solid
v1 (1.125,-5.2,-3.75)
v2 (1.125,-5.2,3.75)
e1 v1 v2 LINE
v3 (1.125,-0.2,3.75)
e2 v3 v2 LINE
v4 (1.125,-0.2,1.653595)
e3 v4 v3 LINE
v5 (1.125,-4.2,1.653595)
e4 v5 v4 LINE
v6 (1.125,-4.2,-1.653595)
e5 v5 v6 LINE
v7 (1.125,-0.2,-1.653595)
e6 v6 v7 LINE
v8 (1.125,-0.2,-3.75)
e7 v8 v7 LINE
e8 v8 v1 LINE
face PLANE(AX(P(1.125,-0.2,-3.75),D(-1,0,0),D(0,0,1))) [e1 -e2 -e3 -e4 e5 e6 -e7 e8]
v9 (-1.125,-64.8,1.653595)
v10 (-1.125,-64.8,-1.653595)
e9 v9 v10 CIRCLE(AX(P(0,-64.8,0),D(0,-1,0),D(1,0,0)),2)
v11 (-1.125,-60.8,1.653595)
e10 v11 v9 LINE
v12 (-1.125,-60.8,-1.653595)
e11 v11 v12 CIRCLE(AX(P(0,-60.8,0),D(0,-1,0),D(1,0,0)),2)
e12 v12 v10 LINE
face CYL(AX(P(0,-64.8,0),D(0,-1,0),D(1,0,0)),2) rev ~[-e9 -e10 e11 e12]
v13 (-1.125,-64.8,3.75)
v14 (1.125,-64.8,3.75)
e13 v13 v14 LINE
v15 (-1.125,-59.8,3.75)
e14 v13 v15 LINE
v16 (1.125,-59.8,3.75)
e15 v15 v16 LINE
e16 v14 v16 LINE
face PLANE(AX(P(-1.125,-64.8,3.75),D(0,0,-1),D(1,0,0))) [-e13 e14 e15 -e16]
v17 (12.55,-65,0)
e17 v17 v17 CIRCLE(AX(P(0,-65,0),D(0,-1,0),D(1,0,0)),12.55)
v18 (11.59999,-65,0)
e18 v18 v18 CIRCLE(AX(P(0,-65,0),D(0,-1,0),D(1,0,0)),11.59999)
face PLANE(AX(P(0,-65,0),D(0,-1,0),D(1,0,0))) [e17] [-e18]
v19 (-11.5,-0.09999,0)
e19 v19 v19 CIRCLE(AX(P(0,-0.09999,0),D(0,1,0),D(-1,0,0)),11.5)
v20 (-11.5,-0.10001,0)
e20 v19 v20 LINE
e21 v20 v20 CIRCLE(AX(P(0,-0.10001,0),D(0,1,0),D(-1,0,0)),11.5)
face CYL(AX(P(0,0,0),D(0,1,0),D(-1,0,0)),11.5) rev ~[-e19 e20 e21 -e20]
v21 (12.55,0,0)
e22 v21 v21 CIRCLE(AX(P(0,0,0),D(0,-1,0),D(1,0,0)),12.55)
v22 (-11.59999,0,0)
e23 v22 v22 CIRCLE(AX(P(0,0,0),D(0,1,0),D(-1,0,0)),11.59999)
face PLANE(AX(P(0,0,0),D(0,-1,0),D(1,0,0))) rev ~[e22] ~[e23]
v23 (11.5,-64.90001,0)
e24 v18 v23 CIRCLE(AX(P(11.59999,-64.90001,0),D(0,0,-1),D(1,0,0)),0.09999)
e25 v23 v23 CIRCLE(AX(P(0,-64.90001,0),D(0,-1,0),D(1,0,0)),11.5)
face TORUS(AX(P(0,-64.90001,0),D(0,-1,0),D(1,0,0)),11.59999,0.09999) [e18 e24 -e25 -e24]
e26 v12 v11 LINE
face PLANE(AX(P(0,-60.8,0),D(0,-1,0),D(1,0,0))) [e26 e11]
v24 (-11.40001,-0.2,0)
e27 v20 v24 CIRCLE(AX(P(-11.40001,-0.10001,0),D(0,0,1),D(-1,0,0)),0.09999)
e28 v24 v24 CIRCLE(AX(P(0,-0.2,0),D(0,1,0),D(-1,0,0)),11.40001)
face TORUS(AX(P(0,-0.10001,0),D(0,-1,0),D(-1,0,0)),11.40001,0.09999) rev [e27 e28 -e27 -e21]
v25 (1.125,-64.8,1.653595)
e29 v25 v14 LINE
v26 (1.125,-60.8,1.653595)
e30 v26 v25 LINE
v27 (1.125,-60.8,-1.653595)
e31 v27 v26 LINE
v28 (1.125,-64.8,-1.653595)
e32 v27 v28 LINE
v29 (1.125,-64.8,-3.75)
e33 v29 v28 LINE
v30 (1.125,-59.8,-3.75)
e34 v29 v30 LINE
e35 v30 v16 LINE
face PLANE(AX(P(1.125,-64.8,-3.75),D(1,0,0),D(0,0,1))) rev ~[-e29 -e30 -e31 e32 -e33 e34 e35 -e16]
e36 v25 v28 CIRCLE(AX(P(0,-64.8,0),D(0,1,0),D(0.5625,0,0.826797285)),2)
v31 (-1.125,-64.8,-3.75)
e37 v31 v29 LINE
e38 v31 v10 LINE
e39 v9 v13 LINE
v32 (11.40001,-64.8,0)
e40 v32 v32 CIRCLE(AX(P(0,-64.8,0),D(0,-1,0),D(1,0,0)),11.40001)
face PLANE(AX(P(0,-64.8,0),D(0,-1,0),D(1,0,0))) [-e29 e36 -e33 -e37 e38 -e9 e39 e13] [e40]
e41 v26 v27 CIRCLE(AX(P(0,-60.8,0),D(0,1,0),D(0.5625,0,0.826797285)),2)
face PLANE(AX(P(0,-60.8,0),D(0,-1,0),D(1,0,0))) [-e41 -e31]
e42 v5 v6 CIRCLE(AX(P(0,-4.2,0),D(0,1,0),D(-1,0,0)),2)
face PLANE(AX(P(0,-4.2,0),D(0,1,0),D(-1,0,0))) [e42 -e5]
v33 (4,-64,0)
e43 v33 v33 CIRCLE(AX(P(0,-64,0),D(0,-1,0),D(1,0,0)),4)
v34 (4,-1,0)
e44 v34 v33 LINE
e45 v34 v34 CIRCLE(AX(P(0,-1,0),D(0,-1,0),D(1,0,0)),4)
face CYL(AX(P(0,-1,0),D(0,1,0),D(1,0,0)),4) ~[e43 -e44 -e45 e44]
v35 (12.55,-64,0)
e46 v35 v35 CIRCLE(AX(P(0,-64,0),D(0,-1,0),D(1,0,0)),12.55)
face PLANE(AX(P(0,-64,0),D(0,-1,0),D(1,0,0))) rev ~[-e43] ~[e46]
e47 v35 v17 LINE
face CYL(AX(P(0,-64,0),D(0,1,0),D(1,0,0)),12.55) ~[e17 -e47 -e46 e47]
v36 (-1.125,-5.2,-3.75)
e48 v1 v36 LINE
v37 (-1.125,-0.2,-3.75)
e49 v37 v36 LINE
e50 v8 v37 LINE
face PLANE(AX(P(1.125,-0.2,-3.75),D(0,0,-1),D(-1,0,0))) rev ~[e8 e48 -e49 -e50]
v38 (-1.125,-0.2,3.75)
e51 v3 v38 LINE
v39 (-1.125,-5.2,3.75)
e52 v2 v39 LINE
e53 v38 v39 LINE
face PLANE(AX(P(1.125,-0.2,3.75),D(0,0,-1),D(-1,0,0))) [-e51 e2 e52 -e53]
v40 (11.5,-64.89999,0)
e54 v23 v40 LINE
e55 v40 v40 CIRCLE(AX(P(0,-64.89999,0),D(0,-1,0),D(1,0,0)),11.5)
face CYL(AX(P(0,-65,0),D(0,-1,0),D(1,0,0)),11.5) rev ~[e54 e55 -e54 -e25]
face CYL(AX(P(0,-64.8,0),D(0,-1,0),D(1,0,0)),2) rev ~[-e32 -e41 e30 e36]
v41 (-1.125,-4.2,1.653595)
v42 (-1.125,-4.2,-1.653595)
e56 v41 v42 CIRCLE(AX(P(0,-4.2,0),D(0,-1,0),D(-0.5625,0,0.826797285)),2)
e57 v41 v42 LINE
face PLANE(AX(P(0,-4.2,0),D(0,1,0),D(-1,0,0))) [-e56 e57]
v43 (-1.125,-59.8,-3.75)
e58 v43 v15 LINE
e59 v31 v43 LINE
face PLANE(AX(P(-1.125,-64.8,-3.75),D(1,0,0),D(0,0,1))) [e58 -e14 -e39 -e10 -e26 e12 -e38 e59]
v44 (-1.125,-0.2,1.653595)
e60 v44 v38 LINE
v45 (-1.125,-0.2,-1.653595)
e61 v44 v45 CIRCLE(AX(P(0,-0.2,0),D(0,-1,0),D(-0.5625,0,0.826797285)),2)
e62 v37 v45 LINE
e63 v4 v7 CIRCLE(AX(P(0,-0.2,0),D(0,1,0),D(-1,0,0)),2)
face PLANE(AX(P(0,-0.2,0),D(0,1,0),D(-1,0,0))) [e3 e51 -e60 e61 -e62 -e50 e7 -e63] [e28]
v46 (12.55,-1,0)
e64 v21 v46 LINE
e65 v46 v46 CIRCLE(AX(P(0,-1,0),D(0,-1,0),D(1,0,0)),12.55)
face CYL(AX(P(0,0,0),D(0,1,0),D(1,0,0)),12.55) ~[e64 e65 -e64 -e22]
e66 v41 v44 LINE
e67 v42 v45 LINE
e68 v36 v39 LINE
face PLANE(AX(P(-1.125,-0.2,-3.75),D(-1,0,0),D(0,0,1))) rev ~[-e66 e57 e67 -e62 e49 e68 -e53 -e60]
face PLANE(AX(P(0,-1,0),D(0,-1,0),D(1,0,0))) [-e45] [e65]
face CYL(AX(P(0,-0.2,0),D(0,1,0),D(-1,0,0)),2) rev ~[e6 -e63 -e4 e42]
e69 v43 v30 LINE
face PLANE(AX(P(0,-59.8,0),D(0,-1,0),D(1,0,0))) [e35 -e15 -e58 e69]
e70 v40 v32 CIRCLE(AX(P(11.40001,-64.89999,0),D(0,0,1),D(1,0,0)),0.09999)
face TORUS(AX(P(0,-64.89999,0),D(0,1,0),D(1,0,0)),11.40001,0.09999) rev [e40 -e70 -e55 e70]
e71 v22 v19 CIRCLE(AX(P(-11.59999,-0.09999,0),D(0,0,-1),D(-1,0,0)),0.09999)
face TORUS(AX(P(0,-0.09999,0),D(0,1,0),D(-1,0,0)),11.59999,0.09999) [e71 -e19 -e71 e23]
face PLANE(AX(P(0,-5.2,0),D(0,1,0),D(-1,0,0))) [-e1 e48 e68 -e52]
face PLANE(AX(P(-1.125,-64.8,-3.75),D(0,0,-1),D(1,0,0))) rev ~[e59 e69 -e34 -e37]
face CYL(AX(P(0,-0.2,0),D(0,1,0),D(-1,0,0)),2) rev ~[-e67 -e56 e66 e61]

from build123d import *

# Parameters (mm, degrees)
F0_R      = 12.55
F1_DEPTH  = 1
F2_R      = 4
F3_DEPTH  = 63
F4_R      = 12.55
F5_DEPTH  = 1
F6_R      = 11.5
F7_DEPTH  = 0.2
F8_R      = 0.09999
F9_R      = 2
F10_DEPTH = 4
F11_W     = 2.25
F11_H     = 7.5
F12_DEPTH = 5
F13_R     = 11.5
F14_DEPTH = 0.2
F15_R     = 0.09999
F16_R     = 2
F17_DEPTH = 4
F18_W     = 2.25
F18_H     = 7.5
F19_DEPTH = 5


# Not quite as in the source:
# - a fillet or chamfer is up to 0.001 mm smaller than in the source, because OpenCascade refuses the exact size


with BuildPart() as f1:
    # F0 (on Front) → F1 (new body)
    with BuildSketch(Plane.XZ):
        Circle(F0_R)
    extrude(amount=F1_DEPTH)

    # F2 (on face) → F3 (join)
    with BuildSketch(Plane.XZ.offset(1)):
        Circle(F2_R)
    extrude(amount=F3_DEPTH)

    # F4 (on face) → F5 (join)
    with BuildSketch(Plane.XZ.offset(64)):
        Circle(F4_R)
    extrude(amount=F5_DEPTH)

    # F6 (on face) → F7 (cut)
    with BuildSketch(Plane.XZ.offset(65)):
        Circle(F6_R)
    extrude(amount=-F7_DEPTH, mode=Mode.SUBTRACT)

    # F8 (radius 0.1 in the source; OpenCascade refuses exactly that, so slightly less here)
    f8_edges = [f1.edges().sort_by_distance(p)[0] for p in [
        (-11.5, -65, 0),
        (11.5, -64.9, 0),
        (-11.5, -64.8, 0),
    ]]
    fillet(f8_edges, radius=F8_R)

    # F9 (on face) → F10 (cut)
    with BuildSketch(Plane.XZ.offset(64.8)):
        Circle(F9_R)
    extrude(amount=-F10_DEPTH, mode=Mode.SUBTRACT)

    # F11 (on face) → F12 (cut)
    with BuildSketch(Plane(origin=(0, -0.2, 0), x_dir=(-1, 0, 0), z_dir=(0, 1, 0))):
        Rectangle(F11_W, F11_H)
    extrude(amount=-F12_DEPTH, mode=Mode.SUBTRACT)

    # F13 (on face) → F14 (cut)
    with BuildSketch(Plane(origin=(0, 0, 0), x_dir=(-1, 0, 0), z_dir=(0, 1, 0))):
        Circle(F13_R)
    extrude(amount=-F14_DEPTH, mode=Mode.SUBTRACT)

    # F15 (radius 0.1 in the source; OpenCascade refuses exactly that, so slightly less here)
    f15_edges = [f1.edges().sort_by_distance(p)[0] for p in [
        (11.5, 0, 0),
        (11.5, -0.2, 0),
    ]]
    fillet(f15_edges, radius=F15_R)

    # F16 (on face) → F17 (cut)
    with BuildSketch(Plane(origin=(0, -0.2, 0), x_dir=(-1, 0, 0), z_dir=(0, 1, 0))):
        Circle(F16_R)
    extrude(amount=-F17_DEPTH, mode=Mode.SUBTRACT)

    # F18 (on face) → F19 (cut)
    with BuildSketch(Plane.XZ.offset(64.8)):
        Rectangle(F18_W, F18_H)
    extrude(amount=-F19_DEPTH, mode=Mode.SUBTRACT)


solid = f1.part
